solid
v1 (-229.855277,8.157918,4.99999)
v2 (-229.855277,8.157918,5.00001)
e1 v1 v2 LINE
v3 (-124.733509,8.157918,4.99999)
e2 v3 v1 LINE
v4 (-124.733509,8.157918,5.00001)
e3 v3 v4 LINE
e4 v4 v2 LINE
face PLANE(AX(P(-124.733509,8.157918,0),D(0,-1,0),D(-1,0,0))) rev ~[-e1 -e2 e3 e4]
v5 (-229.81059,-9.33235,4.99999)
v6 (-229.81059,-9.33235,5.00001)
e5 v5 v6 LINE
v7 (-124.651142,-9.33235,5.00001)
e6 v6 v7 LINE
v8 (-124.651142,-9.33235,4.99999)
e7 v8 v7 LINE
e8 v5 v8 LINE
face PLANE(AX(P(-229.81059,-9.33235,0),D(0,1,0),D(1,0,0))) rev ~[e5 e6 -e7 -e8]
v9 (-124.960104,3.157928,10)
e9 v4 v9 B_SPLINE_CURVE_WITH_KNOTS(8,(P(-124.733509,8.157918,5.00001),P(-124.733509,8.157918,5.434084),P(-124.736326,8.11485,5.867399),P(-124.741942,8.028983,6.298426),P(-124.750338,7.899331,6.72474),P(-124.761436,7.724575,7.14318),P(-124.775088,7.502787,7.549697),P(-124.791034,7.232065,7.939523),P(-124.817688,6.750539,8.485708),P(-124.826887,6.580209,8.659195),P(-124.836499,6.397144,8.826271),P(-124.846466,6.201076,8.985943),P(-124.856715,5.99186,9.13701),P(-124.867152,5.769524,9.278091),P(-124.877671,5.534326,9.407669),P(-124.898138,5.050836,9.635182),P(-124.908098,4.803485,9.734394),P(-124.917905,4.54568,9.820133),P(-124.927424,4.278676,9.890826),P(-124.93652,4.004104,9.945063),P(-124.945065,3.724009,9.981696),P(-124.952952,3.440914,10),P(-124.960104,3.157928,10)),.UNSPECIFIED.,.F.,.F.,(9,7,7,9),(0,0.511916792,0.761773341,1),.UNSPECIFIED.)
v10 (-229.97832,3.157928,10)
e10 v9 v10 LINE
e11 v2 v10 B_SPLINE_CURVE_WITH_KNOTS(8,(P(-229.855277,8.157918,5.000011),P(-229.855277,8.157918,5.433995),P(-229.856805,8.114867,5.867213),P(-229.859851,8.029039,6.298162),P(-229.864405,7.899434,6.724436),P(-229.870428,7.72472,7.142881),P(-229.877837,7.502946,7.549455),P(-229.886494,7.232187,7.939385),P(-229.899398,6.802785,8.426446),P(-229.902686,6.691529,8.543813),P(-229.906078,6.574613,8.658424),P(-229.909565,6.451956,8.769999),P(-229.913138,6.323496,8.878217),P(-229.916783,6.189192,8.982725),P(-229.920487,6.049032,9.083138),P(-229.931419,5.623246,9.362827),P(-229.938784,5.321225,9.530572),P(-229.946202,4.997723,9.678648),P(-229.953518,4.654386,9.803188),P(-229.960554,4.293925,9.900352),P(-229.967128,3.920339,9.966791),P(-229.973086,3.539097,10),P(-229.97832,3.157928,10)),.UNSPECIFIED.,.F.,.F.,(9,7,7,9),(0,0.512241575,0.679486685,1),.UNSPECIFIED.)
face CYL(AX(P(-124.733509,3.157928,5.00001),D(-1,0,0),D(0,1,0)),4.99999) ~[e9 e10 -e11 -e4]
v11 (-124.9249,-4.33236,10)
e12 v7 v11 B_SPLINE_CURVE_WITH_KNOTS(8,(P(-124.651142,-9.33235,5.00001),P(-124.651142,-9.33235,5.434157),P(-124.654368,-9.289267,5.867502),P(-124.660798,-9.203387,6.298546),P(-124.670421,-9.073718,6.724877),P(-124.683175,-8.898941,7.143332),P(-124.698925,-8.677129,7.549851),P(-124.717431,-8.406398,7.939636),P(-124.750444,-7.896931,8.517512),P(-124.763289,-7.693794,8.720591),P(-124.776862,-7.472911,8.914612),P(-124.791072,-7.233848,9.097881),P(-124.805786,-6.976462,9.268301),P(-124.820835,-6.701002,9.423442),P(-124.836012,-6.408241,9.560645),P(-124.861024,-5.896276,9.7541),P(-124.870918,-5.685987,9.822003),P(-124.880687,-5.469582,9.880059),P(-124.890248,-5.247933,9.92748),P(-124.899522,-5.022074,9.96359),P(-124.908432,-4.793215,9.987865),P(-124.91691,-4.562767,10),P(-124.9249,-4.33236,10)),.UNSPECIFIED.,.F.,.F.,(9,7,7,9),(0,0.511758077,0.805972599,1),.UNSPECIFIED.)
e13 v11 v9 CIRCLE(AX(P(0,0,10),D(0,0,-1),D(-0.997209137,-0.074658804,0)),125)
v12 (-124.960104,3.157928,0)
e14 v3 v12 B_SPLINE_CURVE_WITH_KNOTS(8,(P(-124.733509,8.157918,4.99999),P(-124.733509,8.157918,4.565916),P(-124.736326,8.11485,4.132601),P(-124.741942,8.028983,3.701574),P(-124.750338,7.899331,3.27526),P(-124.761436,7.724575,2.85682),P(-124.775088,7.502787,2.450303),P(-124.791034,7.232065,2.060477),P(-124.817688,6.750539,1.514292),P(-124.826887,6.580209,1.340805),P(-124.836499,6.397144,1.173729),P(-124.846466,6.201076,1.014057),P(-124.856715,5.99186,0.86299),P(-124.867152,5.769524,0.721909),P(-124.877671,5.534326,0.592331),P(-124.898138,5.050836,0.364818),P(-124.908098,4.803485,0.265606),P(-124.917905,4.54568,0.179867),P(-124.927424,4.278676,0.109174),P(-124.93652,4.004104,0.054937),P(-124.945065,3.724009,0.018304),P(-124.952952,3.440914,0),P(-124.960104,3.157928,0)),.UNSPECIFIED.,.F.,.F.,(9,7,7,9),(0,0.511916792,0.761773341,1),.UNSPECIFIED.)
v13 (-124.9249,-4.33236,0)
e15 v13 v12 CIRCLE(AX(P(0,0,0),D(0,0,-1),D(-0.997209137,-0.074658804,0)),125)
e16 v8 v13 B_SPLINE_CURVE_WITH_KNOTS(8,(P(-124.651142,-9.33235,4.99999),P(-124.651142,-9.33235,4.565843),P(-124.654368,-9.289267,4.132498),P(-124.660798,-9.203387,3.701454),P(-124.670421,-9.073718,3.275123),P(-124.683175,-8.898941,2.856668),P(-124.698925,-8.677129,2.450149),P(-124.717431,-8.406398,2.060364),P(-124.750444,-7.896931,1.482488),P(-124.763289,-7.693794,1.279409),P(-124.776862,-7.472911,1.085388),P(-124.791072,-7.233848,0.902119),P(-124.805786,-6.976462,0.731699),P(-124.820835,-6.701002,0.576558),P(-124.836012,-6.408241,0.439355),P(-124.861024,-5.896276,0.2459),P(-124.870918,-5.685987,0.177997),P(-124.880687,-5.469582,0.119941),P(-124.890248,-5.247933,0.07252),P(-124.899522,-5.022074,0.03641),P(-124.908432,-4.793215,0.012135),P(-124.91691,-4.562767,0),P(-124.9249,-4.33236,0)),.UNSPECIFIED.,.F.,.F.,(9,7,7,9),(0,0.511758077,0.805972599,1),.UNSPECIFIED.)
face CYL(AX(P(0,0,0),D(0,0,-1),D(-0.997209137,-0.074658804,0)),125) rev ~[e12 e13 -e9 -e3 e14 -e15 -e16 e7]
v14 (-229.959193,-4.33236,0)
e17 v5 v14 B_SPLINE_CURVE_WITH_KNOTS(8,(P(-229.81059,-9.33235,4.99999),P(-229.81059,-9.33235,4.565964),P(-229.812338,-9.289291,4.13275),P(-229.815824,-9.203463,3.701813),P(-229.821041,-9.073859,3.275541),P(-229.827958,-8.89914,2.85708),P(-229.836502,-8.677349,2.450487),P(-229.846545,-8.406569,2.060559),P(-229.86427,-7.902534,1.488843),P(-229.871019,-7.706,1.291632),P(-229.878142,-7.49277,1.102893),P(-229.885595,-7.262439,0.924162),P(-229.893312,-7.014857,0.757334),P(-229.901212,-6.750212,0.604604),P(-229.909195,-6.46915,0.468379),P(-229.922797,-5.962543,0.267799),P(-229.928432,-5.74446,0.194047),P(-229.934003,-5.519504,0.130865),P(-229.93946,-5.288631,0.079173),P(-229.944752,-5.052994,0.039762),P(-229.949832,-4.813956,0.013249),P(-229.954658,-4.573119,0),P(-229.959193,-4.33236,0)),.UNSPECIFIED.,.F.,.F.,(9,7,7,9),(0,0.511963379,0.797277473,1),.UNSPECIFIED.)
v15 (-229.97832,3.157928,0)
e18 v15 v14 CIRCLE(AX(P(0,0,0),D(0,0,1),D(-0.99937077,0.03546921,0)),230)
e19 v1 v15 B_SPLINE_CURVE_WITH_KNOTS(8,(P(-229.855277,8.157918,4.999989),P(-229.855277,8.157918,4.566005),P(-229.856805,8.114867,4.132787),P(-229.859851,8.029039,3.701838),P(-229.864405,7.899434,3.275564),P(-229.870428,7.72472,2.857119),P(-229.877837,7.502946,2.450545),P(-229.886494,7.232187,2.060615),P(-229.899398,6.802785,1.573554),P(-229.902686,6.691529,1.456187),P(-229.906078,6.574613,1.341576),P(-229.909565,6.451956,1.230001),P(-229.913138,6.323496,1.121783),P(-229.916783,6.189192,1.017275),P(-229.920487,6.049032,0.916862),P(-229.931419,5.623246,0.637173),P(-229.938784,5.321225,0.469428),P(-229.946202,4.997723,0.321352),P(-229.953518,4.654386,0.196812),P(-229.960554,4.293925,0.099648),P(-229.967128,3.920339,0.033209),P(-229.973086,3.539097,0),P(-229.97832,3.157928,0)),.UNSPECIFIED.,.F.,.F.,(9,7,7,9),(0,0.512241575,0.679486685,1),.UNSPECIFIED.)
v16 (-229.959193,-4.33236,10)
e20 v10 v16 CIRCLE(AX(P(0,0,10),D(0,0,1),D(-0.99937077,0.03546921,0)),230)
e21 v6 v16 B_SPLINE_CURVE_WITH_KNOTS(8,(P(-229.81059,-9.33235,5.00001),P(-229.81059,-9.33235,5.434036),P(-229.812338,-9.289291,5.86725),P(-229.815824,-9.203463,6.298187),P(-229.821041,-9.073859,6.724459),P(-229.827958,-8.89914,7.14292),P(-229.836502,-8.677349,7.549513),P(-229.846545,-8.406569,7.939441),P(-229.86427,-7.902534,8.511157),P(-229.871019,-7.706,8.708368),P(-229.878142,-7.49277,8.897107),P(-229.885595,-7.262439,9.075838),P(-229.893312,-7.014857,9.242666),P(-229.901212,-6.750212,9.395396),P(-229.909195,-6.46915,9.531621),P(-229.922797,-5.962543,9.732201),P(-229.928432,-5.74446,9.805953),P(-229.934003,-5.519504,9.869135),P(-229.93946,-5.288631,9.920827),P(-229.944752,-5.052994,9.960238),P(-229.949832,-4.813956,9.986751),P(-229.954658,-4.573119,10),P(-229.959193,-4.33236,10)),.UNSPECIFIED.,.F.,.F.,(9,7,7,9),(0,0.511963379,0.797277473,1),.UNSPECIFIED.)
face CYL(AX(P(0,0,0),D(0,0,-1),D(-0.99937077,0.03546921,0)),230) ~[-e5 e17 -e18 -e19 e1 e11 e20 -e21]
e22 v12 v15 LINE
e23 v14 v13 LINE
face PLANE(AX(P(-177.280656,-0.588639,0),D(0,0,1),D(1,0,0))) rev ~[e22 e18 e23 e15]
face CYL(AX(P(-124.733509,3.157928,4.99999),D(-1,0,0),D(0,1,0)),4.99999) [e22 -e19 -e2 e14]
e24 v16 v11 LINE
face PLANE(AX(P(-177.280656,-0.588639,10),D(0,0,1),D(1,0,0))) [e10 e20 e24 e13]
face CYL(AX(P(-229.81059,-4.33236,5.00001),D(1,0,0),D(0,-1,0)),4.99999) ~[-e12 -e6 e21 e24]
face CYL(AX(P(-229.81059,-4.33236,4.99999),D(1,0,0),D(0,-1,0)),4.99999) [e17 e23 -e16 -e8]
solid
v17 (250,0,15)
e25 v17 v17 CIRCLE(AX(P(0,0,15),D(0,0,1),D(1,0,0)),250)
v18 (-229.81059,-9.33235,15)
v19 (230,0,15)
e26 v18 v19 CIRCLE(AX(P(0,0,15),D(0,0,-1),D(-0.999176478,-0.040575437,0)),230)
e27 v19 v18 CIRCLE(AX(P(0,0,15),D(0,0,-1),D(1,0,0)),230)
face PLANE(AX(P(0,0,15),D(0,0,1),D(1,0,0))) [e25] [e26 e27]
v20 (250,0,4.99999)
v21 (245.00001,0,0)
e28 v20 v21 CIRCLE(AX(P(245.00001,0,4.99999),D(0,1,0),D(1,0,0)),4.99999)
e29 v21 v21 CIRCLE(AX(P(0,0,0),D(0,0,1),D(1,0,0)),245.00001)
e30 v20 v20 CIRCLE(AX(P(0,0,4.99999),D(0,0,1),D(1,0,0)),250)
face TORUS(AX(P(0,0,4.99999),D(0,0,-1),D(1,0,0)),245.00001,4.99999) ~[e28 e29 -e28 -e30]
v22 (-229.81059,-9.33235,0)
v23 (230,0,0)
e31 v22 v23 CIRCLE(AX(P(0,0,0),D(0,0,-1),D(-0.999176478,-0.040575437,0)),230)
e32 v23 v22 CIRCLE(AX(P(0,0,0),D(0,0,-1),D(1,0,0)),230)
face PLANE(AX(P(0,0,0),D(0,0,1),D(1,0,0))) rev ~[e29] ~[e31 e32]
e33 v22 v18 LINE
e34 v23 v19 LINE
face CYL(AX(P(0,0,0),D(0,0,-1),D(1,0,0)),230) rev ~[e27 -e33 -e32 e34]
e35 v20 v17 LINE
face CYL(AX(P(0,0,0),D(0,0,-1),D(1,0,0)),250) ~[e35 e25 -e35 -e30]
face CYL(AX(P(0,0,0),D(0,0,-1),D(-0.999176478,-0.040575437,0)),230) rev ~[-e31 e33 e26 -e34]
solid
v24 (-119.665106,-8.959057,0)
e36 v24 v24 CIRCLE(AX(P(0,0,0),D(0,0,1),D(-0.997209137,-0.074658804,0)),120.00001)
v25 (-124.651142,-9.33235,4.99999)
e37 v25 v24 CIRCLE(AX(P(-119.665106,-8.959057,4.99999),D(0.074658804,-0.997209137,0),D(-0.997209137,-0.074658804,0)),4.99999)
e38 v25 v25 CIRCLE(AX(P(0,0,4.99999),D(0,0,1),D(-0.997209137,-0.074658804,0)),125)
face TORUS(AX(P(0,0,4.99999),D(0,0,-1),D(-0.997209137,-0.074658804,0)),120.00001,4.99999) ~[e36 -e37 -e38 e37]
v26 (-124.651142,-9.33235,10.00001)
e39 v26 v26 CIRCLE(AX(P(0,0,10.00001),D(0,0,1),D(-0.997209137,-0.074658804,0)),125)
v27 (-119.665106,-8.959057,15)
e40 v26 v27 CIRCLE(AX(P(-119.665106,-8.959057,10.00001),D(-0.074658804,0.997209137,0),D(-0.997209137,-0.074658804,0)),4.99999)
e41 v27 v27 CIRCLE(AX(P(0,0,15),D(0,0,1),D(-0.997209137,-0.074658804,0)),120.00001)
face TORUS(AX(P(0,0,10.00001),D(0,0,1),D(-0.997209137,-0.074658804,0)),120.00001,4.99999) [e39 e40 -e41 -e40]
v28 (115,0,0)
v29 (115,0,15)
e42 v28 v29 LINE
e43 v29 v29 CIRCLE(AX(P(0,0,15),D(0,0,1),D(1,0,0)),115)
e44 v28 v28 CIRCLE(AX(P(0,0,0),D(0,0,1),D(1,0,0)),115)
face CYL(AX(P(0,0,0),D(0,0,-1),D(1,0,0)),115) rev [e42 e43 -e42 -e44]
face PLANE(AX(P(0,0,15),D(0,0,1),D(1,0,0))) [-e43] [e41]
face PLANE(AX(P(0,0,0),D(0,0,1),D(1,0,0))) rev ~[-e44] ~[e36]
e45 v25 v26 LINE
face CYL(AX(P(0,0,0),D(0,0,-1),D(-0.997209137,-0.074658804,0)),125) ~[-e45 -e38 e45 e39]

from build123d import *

# Parameters (mm, degrees)
F0_R     = 250
F1_DEPTH = 15
F0_R_2   = 115
F2_DEPTH = 10
F3_R     = 4.99999
F3_2_R   = 4.99999
F3_3_R   = 4.99999


# Not quite as in the source:
# - a fillet or chamfer is up to 0.001 mm smaller than in the source, because OpenCascade refuses the exact size


with BuildPart() as f1:
    # F0 (on Top) → F1 (new body)
    with BuildSketch(Plane.XY):
        Circle(F0_R)
        with BuildLine():
            ThreePointArc((-229.8105899104, -9.3323504552), (-229.9992492988, -0.5876410446), (-229.8552770118, 8.1579182297))
            ThreePointArc((-229.8552770118, 8.1579182297), (4.0796009175, 229.9638164067), (230, 0))
            ThreePointArc((230, 0), (4.667136199, -229.9526426021), (-229.8105899104, -9.3323504552))
        make_face(mode=Mode.SUBTRACT)
    extrude(amount=F1_DEPTH)

    # F3#2 (radius 5 in the source; OpenCascade refuses exactly that, so slightly less here)
    f3_2_edges = [f1.edges().sort_by_distance(p)[0] for p in [
        (-250, 0, 0),
    ]]
    fillet(f3_2_edges, radius=F3_2_R)


with BuildPart() as f1b:
    # F0 (on Top) → F1, piece 2 (new body)
    with BuildSketch(Plane.XY):
        with BuildLine():
            ThreePointArc((-124.6511421327, -9.3323504552), (4.6694343027, -124.9127550865), (125, 0))
            ThreePointArc((125, 0), (4.0811348629, 124.9333595891), (-124.7335094117, 8.1579182297))
            ThreePointArc((-124.7335094117, 8.1579182297), (-124.9986139169, -0.5886585218), (-124.6511421327, -9.3323504552))
        make_face()
        Circle(F0_R_2, mode=Mode.SUBTRACT)
    extrude(amount=F1_DEPTH)

    # F3#3 (radius 5 in the source; OpenCascade refuses exactly that, so slightly less here)
    f3_3_edges = [f1b.edges().sort_by_distance(p)[0] for p in [
        (-124.998614, -0.588659, 0),
        (-125, 0, 15),
    ]]
    fillet(f3_3_edges, radius=F3_3_R)


with BuildPart() as f2:
    # F0 (on Top) → F2 (new body)
    with BuildSketch(Plane.XY):
        with BuildLine():
            ThreePointArc((-124.6511421327, -9.3323504552), (-124.9986139169, -0.5886585218), (-124.7335094117, 8.1579182297))
            Line((-124.7335094117, 8.1579182297), (-229.8552770118, 8.1579182297))
            ThreePointArc((-229.8552770118, 8.1579182297), (-229.9992492988, -0.5876410446), (-229.8105899104, -9.3323504552))
            Line((-229.8105899104, -9.3323504552), (-124.6511421327, -9.3323504552))
        make_face()
    extrude(amount=F2_DEPTH)

    # F3 (radius 5 in the source; OpenCascade refuses exactly that, so slightly less here)
    f3_edges = [f2.edges().sort_by_distance(p)[0] for p in [
        (-177.294393, 8.157918, 0),
        (-177.230866, -9.33235, 0),
        (-177.294393, 8.157918, 10),
        (-177.230866, -9.33235, 10),
    ]]
    fillet(f3_edges, radius=F3_R)


solid = Compound([f1.part, f1b.part, f2.part])
